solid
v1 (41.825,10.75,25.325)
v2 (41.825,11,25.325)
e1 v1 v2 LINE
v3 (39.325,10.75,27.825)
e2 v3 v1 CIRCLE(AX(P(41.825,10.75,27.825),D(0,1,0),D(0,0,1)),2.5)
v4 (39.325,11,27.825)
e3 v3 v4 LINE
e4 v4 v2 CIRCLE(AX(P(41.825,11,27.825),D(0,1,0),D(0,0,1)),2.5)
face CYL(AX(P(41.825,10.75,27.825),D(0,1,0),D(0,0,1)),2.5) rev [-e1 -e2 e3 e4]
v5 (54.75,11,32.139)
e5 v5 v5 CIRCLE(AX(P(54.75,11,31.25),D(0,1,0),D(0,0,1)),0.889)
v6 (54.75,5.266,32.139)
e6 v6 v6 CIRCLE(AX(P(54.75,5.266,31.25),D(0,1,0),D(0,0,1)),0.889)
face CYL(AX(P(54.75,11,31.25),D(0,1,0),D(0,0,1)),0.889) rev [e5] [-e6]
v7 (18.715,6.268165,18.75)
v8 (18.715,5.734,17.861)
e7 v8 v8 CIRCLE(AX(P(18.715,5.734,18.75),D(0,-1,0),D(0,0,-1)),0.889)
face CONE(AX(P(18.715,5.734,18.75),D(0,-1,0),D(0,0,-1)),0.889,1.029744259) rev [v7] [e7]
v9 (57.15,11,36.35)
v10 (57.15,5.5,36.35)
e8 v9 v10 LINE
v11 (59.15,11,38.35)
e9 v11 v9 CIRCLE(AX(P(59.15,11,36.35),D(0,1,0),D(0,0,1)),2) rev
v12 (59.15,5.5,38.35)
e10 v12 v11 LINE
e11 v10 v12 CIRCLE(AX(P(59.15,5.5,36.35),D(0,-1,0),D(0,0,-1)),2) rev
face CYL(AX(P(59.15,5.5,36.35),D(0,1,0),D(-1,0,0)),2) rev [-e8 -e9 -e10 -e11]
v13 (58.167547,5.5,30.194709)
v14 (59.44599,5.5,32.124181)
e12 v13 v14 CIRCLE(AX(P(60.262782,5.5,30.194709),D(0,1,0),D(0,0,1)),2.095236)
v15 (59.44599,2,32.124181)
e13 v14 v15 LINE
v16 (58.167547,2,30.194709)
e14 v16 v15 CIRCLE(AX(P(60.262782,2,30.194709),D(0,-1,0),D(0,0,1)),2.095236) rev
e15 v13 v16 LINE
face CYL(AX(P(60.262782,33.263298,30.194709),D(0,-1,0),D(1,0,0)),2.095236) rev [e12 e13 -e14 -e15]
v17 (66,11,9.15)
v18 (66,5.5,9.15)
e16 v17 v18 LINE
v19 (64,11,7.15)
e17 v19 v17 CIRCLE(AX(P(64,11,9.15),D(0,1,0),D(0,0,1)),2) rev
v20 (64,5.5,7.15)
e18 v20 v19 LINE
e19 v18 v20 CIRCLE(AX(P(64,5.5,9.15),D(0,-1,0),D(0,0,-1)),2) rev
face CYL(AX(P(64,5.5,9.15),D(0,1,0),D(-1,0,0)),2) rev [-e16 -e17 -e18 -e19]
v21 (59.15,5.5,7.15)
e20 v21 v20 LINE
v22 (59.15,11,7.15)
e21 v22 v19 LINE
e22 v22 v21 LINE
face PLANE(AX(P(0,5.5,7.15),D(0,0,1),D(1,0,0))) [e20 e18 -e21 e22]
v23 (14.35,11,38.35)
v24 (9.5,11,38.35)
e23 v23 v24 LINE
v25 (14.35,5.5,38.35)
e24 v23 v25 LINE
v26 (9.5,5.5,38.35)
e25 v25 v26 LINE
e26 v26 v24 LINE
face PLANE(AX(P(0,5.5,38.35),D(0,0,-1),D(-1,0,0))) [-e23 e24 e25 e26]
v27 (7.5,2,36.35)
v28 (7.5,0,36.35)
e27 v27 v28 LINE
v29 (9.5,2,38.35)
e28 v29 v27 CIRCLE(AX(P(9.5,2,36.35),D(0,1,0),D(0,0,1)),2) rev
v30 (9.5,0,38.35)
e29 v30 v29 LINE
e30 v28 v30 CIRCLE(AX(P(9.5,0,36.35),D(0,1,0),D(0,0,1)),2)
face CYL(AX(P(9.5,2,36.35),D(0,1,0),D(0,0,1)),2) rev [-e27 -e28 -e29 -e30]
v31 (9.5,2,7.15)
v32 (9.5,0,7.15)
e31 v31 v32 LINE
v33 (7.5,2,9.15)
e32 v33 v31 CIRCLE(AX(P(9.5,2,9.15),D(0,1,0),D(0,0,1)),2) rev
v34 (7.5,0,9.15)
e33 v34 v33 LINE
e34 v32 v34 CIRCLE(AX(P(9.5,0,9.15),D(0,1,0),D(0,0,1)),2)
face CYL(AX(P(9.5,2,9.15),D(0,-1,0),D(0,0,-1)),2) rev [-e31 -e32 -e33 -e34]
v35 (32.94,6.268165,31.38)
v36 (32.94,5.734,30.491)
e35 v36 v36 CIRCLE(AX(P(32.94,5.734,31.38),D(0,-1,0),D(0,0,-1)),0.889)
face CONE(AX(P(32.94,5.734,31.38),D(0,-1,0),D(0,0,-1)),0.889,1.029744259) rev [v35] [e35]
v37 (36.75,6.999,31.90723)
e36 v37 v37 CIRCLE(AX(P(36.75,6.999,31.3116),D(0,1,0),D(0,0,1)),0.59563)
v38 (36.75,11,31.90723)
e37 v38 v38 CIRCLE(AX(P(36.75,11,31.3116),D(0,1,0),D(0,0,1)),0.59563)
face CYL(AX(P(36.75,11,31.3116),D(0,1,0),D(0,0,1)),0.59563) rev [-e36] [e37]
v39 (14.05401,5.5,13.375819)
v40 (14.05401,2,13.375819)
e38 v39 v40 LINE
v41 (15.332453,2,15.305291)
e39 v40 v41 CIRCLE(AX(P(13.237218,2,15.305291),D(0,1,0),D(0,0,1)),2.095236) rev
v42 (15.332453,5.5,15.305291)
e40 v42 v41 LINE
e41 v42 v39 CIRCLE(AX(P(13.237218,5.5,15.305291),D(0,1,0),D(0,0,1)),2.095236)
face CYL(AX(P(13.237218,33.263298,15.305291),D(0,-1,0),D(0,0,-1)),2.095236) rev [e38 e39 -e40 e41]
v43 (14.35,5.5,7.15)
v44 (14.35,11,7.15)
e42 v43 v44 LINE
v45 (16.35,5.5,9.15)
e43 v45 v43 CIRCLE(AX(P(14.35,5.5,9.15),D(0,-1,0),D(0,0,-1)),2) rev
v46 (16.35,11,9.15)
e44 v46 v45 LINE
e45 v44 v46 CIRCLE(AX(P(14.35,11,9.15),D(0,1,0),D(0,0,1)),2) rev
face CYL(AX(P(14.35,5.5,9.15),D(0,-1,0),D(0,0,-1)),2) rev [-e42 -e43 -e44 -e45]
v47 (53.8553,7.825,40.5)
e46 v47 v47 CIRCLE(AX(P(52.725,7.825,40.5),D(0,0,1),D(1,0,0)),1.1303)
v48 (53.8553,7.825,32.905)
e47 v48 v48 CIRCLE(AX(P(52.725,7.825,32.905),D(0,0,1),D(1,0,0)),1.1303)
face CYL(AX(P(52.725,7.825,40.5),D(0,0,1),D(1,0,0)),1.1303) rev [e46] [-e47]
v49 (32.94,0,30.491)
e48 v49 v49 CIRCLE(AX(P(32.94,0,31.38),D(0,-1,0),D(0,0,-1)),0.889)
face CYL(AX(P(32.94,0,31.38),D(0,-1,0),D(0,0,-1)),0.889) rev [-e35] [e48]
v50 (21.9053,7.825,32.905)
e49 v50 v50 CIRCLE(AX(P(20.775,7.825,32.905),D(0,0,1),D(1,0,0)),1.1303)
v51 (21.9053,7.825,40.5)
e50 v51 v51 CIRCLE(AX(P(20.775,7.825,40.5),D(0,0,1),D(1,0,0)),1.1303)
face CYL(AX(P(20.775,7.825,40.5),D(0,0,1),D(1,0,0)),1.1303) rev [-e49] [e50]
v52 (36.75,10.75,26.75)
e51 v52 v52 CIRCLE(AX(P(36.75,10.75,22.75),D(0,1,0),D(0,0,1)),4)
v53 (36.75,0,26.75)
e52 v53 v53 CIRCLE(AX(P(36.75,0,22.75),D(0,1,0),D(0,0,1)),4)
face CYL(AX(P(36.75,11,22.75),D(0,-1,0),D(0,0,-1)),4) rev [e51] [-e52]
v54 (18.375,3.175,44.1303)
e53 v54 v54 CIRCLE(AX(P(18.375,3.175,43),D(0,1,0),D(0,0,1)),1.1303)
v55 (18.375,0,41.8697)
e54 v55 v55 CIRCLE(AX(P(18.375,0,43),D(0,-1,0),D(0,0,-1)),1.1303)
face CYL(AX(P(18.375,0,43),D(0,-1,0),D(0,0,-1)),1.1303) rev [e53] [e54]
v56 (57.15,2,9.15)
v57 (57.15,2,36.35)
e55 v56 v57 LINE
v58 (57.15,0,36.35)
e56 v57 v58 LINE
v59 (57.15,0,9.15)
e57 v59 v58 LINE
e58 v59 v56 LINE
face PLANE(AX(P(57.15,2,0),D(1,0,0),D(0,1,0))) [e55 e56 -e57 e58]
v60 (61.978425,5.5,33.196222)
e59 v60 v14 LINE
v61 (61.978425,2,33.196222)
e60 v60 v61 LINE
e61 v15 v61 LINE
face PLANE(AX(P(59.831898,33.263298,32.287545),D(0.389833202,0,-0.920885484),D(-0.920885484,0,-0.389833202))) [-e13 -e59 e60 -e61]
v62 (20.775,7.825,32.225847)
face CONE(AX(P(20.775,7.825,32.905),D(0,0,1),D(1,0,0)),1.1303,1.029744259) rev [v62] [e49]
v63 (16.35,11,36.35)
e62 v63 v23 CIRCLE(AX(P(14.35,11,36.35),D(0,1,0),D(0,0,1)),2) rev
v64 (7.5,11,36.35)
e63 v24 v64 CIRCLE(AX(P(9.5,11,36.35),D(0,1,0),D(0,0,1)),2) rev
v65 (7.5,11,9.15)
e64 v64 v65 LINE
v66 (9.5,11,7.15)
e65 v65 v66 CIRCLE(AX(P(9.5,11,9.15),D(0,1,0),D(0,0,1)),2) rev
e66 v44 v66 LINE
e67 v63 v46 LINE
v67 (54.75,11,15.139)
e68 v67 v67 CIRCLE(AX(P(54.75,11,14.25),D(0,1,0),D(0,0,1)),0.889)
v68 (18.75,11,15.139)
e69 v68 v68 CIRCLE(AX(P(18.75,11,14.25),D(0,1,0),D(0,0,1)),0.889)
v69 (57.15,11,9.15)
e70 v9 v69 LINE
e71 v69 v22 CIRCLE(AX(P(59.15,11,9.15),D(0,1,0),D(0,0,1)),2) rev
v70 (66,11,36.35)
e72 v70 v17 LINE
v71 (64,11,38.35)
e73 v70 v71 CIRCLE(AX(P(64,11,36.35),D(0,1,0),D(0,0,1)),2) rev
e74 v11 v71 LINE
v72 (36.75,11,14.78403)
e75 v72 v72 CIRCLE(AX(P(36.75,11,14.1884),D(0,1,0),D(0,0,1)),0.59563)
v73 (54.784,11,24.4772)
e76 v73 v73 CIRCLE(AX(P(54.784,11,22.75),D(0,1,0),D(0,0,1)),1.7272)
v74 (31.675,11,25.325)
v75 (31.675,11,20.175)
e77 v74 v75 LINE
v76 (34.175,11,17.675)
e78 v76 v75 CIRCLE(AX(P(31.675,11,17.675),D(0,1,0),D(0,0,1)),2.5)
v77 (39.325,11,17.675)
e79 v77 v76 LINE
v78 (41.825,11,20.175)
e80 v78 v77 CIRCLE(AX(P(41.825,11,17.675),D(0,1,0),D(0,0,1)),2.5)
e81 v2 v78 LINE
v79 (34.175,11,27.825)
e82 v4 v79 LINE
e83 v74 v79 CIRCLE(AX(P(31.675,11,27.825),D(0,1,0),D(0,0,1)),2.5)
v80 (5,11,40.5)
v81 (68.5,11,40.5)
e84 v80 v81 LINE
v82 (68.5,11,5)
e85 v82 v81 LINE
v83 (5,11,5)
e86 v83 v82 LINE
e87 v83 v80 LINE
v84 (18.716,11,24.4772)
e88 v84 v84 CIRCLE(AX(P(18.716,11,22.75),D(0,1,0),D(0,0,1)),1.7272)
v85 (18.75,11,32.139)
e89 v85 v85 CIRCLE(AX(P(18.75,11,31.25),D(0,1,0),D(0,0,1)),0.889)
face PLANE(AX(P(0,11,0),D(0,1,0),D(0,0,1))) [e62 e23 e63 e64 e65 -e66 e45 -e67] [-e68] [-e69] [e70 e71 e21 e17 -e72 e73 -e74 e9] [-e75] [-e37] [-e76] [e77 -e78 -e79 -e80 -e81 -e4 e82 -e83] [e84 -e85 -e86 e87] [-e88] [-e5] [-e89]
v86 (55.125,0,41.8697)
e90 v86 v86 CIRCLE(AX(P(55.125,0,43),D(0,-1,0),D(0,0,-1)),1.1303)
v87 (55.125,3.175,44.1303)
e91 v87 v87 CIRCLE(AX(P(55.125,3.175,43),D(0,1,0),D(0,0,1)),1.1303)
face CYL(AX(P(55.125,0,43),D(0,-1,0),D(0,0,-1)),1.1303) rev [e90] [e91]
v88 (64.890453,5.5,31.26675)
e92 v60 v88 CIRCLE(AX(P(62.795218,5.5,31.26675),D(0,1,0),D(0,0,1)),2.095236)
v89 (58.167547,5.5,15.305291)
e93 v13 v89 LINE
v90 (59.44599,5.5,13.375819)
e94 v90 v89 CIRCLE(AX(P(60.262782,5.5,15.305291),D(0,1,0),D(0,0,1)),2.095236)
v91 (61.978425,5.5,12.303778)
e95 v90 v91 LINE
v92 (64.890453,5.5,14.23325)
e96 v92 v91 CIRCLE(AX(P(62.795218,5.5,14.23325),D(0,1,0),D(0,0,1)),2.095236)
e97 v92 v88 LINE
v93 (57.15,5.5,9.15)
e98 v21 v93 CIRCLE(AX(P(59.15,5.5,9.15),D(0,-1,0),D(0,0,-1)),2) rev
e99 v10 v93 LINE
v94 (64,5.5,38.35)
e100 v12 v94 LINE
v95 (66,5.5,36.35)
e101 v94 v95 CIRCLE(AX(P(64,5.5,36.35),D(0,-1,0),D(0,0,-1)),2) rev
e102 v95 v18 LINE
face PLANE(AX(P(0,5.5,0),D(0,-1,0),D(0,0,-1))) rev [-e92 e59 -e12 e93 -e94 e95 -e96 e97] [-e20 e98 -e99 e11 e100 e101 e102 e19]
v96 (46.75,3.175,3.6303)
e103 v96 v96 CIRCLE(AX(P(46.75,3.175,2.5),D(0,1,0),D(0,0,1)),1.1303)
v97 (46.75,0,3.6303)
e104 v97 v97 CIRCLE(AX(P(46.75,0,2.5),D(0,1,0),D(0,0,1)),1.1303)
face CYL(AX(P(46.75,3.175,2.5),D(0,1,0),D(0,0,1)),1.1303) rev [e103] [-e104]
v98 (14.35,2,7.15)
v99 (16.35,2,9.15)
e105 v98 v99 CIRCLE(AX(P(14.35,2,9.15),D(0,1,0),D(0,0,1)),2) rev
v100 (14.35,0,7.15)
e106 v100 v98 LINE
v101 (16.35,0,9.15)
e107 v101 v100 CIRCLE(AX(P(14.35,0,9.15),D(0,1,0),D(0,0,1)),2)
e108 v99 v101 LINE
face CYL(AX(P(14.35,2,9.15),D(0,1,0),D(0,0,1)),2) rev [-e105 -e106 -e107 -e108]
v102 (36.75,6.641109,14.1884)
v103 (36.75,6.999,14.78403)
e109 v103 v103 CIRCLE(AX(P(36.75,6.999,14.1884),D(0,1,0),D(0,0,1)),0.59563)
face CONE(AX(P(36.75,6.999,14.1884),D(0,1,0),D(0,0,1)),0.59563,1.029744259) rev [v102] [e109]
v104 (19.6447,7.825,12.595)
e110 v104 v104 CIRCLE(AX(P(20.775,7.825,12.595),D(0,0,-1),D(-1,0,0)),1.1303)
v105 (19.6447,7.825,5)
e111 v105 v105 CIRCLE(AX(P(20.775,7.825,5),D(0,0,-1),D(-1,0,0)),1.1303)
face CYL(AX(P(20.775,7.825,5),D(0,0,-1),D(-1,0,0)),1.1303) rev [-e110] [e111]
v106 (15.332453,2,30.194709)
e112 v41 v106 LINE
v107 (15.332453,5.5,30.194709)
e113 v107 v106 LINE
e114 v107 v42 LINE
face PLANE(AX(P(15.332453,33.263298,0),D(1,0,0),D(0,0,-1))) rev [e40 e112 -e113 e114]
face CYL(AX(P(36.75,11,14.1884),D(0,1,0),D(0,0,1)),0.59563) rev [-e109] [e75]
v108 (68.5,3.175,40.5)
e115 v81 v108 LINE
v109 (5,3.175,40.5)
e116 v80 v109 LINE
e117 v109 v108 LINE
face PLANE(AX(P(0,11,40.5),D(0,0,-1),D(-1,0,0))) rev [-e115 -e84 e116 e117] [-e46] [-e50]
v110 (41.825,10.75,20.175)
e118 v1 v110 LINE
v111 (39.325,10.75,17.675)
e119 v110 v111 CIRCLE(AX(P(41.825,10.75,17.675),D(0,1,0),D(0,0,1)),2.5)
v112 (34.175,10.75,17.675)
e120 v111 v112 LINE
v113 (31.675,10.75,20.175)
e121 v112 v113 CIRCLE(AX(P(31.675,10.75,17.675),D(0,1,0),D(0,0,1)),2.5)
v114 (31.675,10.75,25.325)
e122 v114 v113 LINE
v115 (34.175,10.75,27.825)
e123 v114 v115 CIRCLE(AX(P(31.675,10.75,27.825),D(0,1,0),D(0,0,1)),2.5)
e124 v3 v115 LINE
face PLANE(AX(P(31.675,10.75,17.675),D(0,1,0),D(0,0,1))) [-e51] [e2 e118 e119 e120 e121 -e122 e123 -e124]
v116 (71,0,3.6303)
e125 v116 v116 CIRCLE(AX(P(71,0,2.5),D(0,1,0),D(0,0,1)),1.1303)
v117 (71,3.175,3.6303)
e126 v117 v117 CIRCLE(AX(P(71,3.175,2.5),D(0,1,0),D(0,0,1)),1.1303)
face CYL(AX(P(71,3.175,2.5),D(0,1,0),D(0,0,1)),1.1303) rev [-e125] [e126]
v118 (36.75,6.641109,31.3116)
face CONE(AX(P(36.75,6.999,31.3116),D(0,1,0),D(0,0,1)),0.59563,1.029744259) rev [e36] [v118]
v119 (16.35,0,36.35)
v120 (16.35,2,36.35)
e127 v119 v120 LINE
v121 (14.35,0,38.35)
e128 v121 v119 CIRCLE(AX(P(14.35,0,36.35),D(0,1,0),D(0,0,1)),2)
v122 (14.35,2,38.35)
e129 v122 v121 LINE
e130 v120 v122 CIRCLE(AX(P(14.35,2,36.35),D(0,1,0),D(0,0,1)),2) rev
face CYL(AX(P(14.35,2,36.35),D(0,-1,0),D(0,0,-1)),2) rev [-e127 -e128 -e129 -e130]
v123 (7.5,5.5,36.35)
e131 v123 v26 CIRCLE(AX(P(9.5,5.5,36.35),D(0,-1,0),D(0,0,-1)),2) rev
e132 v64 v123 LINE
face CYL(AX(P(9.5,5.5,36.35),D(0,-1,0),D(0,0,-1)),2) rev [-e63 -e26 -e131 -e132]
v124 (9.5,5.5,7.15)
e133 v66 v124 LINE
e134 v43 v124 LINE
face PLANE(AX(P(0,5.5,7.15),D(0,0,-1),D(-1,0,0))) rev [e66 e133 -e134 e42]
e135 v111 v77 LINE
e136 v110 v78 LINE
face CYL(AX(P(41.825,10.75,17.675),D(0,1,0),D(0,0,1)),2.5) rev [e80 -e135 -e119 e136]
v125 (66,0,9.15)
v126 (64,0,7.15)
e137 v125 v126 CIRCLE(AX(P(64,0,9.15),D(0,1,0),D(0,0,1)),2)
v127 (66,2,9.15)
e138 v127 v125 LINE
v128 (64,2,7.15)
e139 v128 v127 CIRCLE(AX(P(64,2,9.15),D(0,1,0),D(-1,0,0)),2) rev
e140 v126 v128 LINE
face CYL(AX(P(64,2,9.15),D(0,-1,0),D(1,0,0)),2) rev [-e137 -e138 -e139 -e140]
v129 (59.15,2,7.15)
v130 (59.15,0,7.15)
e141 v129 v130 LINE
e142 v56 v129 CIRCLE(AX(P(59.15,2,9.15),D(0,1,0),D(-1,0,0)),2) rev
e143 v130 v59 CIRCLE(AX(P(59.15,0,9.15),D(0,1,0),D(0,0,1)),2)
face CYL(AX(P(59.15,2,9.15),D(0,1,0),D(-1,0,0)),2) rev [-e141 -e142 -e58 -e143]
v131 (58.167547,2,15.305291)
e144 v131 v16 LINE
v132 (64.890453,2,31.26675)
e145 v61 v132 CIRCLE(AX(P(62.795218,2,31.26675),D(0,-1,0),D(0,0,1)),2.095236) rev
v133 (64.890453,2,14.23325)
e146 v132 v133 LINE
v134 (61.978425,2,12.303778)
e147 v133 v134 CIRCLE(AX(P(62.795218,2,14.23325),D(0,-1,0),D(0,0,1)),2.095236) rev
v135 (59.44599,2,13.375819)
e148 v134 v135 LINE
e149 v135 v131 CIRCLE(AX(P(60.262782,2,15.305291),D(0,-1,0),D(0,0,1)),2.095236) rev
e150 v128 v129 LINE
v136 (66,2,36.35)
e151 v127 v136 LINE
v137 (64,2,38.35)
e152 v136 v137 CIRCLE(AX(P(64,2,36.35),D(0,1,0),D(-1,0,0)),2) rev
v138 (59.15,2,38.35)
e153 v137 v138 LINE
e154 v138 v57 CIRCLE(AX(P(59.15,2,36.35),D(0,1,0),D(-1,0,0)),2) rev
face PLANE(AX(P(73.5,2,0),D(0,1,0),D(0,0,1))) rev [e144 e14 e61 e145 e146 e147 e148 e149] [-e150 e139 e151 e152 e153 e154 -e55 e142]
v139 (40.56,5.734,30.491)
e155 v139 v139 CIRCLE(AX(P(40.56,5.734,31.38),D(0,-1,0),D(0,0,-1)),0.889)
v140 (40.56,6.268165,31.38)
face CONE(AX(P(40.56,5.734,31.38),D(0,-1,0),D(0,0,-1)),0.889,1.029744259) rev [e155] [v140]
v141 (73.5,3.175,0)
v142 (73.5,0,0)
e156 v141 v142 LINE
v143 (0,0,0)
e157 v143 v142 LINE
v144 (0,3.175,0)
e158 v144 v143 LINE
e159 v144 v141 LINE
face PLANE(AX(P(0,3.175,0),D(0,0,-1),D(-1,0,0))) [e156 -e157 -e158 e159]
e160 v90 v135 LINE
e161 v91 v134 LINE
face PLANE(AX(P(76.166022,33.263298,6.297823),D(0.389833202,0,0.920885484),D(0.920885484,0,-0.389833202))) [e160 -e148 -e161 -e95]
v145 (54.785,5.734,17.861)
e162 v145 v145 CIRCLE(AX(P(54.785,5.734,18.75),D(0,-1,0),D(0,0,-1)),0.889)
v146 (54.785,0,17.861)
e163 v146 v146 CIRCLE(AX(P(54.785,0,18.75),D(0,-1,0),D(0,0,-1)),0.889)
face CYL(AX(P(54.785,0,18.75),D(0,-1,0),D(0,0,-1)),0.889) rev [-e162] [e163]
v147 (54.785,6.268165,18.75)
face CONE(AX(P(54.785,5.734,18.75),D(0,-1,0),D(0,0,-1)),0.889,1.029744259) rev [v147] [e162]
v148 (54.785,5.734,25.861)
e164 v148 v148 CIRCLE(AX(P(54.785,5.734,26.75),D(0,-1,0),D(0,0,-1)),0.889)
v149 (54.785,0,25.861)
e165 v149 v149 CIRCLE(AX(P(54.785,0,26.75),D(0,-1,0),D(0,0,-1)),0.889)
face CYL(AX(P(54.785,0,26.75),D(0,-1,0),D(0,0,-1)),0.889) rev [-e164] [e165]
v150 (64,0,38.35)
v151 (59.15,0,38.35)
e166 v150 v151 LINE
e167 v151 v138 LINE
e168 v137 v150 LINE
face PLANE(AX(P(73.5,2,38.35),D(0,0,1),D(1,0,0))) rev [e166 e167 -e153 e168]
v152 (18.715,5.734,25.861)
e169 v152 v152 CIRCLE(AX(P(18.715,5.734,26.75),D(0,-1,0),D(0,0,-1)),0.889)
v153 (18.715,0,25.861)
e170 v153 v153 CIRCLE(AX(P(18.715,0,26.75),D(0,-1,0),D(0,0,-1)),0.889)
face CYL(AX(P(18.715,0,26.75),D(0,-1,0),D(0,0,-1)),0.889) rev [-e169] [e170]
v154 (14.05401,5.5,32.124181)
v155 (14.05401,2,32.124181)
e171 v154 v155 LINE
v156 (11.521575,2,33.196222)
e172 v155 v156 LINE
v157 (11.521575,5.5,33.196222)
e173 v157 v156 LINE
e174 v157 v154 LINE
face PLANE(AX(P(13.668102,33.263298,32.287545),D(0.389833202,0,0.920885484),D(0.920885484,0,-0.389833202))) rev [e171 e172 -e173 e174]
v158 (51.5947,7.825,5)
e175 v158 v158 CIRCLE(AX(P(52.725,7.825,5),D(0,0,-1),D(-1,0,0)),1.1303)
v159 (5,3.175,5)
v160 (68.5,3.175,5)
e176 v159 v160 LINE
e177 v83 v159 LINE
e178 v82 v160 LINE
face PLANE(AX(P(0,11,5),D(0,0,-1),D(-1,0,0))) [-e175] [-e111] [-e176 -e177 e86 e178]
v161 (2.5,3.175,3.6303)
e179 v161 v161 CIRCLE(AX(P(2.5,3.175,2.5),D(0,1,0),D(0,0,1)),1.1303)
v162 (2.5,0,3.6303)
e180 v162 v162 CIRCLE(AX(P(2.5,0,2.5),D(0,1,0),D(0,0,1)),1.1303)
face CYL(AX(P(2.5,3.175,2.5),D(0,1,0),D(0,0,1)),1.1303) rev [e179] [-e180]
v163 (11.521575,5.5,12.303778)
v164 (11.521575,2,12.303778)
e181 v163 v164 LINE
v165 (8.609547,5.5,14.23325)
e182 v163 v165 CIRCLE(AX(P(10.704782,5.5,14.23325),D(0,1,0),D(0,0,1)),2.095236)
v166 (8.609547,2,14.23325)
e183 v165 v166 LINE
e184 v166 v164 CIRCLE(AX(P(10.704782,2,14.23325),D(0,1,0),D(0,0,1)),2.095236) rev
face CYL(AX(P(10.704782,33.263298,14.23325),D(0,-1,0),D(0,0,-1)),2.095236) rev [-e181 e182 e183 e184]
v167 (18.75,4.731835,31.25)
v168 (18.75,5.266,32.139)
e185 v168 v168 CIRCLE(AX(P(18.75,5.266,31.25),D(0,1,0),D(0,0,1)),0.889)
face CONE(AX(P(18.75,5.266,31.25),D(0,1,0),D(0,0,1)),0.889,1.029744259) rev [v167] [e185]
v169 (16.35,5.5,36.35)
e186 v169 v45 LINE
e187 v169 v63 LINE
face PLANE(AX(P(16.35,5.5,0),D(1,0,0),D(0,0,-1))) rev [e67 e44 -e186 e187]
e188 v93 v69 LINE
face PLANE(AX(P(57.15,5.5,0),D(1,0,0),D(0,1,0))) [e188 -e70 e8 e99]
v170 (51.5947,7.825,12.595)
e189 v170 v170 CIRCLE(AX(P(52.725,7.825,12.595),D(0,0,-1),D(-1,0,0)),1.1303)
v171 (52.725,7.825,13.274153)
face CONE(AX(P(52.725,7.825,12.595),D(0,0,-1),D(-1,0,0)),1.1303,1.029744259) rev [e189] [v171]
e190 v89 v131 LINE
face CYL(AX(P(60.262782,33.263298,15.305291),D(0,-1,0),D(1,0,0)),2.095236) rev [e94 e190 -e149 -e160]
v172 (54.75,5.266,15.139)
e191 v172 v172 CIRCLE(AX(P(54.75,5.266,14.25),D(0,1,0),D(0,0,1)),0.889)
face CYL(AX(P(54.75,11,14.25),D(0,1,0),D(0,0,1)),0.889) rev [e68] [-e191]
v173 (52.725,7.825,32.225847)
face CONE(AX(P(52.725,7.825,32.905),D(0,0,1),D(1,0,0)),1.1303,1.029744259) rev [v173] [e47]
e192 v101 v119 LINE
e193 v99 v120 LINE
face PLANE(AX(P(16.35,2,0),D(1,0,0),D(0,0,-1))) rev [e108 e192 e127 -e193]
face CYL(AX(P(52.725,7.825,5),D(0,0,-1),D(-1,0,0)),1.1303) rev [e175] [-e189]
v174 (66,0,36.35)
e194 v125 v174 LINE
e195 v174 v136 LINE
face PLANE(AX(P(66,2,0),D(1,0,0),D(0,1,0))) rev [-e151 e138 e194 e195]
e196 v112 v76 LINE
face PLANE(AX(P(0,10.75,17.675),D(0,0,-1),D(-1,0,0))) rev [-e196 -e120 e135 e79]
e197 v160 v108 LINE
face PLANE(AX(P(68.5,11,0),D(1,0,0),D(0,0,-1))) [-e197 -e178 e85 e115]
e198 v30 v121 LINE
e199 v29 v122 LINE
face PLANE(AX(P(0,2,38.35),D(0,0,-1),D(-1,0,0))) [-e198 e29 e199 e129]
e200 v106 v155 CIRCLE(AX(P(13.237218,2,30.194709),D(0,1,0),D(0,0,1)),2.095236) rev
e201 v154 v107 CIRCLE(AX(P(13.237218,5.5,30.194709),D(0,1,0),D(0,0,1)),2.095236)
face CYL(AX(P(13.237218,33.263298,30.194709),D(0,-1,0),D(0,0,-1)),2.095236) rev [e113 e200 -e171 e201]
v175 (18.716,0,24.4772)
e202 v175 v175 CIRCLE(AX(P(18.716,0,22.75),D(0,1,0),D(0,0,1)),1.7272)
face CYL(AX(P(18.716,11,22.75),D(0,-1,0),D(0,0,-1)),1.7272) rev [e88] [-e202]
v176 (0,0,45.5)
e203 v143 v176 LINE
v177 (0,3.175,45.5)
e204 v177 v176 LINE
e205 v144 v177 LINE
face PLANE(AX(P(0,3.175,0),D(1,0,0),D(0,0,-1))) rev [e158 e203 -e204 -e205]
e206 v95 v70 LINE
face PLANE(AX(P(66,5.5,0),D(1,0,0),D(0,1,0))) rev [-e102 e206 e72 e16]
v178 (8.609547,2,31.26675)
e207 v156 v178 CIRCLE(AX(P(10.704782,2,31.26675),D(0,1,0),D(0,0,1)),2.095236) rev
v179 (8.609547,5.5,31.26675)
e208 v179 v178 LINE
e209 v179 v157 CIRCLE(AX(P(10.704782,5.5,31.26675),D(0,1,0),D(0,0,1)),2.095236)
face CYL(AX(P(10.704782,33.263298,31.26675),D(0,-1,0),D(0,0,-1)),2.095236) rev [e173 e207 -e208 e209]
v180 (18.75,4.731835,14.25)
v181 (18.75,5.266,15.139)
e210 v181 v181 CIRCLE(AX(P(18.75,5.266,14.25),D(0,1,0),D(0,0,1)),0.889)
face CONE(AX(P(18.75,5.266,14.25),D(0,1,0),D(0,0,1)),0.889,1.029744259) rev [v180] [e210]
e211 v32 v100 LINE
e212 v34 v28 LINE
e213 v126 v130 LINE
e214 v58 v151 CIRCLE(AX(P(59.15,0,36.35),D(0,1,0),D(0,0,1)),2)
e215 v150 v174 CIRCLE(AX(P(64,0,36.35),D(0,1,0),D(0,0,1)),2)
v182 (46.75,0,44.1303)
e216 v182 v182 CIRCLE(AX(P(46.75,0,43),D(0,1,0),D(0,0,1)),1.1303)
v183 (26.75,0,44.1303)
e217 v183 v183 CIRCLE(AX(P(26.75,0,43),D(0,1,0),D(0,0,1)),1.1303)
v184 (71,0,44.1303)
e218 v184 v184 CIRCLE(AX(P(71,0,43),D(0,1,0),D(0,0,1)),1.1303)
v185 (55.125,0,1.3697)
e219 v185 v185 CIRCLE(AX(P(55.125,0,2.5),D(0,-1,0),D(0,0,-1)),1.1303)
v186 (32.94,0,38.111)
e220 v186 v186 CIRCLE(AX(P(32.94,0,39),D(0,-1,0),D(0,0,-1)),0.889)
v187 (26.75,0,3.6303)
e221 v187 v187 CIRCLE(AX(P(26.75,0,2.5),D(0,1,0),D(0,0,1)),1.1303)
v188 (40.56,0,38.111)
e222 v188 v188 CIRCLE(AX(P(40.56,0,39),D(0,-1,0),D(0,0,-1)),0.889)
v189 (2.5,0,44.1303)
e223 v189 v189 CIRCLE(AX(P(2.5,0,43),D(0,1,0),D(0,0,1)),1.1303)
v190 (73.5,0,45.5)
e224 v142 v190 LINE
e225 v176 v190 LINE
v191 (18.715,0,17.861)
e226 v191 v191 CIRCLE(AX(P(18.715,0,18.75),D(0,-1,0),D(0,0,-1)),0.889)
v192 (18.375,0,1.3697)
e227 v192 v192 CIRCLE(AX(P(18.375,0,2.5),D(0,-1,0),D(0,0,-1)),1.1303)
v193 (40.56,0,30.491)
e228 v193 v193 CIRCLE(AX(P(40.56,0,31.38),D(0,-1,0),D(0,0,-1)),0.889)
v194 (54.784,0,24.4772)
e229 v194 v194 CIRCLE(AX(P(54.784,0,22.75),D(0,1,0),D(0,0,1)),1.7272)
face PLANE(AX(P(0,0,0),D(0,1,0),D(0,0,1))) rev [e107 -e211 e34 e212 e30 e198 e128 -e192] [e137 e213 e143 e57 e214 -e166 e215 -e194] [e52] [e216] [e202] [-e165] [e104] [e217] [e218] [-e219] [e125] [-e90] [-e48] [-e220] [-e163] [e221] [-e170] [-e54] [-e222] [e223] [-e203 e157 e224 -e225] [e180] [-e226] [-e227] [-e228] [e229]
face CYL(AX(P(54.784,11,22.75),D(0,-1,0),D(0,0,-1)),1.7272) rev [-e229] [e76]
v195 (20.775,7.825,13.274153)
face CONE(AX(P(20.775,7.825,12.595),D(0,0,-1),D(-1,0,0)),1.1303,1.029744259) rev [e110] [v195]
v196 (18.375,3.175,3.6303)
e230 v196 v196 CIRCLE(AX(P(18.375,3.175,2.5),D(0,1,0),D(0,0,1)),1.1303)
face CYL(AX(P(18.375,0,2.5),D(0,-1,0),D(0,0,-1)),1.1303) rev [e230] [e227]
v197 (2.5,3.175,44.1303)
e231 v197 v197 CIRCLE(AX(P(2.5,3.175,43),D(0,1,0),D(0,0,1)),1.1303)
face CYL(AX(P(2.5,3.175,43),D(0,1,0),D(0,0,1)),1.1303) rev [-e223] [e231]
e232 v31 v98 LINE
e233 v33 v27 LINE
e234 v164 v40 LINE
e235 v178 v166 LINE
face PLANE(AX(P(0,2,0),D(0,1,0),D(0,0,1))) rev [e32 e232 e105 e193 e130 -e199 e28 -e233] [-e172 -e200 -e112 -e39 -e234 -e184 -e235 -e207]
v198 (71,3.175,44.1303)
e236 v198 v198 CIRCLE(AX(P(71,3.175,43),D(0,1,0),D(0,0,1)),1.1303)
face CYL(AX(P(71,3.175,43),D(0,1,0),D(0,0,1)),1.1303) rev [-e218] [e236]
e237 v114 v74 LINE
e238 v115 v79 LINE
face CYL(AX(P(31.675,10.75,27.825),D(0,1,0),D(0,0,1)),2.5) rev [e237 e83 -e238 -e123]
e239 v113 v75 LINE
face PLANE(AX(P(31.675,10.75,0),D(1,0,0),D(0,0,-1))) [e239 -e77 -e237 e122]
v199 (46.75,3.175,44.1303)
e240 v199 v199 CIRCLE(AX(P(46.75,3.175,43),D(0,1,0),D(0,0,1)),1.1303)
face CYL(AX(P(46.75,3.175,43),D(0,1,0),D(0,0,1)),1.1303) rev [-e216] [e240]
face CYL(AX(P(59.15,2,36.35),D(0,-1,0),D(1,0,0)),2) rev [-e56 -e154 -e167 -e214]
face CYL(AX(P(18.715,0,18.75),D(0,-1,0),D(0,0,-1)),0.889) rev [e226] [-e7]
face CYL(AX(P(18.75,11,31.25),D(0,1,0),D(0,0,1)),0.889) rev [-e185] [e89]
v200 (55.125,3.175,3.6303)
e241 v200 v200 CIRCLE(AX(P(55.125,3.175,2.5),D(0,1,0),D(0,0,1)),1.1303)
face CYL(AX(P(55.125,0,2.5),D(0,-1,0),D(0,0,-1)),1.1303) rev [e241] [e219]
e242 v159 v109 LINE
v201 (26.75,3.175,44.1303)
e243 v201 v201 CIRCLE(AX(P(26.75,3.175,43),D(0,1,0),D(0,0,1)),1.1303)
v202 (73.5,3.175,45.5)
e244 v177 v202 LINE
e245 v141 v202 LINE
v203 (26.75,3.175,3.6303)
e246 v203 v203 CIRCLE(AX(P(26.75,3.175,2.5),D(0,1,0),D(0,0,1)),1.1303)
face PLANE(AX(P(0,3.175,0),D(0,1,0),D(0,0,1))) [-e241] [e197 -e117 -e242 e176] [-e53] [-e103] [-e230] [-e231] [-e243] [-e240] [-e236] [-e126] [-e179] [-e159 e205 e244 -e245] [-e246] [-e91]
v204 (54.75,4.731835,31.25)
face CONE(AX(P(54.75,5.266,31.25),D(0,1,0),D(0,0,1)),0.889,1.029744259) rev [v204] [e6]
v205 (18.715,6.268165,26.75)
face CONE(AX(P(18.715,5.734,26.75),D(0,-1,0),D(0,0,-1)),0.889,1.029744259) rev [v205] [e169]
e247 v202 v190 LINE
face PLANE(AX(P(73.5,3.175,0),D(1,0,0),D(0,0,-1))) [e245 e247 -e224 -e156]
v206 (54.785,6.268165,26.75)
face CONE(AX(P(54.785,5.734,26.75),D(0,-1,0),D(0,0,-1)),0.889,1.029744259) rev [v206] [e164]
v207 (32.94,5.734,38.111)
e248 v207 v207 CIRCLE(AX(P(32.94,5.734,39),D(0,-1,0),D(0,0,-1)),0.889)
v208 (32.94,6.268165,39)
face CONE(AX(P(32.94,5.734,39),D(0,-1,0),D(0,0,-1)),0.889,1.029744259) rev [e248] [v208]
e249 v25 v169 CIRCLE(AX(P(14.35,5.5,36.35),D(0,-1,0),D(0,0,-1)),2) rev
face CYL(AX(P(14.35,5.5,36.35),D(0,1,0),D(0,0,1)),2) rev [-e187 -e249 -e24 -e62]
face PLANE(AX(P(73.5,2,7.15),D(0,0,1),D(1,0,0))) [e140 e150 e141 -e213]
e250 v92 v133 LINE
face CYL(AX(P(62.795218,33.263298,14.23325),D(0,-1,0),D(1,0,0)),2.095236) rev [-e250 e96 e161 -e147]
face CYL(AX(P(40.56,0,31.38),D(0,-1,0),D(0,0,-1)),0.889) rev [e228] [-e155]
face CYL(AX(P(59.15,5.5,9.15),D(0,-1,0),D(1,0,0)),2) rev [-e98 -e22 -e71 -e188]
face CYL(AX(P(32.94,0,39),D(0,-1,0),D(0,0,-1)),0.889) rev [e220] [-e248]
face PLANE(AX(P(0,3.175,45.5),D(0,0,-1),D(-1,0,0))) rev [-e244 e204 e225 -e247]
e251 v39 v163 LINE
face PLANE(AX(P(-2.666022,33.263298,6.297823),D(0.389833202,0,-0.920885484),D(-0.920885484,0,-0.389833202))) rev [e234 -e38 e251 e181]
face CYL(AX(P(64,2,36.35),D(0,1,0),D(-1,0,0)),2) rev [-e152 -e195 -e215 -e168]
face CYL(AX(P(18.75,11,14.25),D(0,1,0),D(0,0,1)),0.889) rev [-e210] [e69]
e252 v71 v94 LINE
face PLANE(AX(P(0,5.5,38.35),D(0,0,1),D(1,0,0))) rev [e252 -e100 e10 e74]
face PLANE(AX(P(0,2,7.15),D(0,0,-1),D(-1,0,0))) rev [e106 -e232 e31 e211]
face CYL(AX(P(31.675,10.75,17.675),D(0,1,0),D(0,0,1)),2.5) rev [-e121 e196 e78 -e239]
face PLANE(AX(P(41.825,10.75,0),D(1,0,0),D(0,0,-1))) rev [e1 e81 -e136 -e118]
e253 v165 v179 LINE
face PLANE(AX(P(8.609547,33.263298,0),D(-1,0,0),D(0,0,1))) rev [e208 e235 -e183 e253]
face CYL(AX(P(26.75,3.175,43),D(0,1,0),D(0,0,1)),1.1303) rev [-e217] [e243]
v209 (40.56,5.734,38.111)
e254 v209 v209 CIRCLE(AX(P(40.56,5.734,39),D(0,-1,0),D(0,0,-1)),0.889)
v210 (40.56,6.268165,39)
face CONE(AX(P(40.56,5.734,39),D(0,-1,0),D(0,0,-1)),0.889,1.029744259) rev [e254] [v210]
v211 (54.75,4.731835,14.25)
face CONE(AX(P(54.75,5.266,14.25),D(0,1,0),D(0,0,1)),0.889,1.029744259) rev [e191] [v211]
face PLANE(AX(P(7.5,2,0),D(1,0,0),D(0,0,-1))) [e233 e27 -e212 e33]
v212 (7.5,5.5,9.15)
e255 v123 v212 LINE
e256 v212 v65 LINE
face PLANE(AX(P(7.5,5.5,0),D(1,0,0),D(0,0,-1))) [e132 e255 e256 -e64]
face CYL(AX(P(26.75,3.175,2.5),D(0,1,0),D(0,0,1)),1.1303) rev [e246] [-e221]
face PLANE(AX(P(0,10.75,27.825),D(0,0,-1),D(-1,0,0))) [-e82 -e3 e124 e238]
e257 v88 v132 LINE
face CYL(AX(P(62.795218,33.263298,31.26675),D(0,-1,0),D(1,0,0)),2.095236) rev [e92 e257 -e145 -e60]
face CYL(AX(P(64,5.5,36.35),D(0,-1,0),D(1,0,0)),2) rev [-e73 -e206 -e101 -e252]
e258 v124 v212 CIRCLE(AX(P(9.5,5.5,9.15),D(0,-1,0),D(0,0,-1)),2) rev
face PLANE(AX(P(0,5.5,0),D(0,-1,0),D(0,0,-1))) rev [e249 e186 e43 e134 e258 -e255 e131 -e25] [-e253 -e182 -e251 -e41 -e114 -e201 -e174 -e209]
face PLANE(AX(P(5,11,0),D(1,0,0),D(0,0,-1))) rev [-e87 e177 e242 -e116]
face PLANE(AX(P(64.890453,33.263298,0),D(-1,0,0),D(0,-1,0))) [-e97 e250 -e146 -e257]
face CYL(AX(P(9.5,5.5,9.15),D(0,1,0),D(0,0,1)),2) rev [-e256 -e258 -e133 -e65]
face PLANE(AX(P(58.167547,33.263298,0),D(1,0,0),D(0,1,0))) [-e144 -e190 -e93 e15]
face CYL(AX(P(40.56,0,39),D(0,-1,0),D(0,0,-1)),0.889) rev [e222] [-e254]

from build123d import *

# Parameters (mm, degrees)
MAIN_SKETCH_W                           = 73.5
MAIN_SKETCH_H                           = 45.5
MAIN_SKETCH_W_2                         = 63.5
MAIN_SKETCH_H_2                         = 35.5
LIP_DEPTH                               = 3.175
MOUNTING_BASE_OUTLINE_W                 = 63.5
MOUNTING_BASE_OUTLINE_H                 = 35.5
MOUNTING_BASE_OUTLINE_R                 = 1.7272
MOUNTING_BASE_OUTLINE_R_2               = 4
MOUNTING_BASE_DEPTH                     = 11
HEATER_CART_4_40_TAPS_D                 = 2.2606
HEATER_CART_4_40_TAPS_DEPTH             = 7.595
HEATER_CART_4_40_TAPS_TIP               = 0.679152758
HEATER_CART_4_40_TAPS_ON_FACE_2_D       = 2.2606
HEATER_CART_4_40_TAPS_ON_FACE_2_DEPTH   = 7.595
HEATER_CART_4_40_TAPS_ON_FACE_2_TIP     = 0.679152758
MAIN_SKETCH_12_W                        = 8.85
MAIN_SKETCH_12_H                        = 31.2
BOTTOM_SQUARE_CUTOUT_DEPTH              = 2
SQUARE_MICRO_D_CUTOUT_START             = 5.5
SQUARE_MICRO_D_CUTOUT_OUTLINE_W         = 8.85
SQUARE_MICRO_D_CUTOUT_OUTLINE_H         = 31.2
SQUARE_MICRO_D_CUTOUT_DEPTH             = 5.5
MAIN_SKETCH_7_R                         = 0.285
ROUND_MICRO_D_CUTOUT_DEPTH              = 11
INTERNAL_CORNER_CUTOUTS_FILLET_R        = 2
CHIP_CLAMP_0_80_TAPS_AT_2_COUNT         = 2
CHIP_CLAMP_0_80_TAPS_AT_2_PITCH         = 17.1232
CHIP_CLAMP_0_80_TAPS_AT_3_COUNT         = 2
CHIP_CLAMP_0_80_TAPS_AT_3_PITCH         = 17.1232
CHIP_POCKET_START                       = 10.75
MAIN_SKETCH_6_R                         = 2.5
MAIN_SKETCH_6_W                         = 10.15
MAIN_SKETCH_6_H                         = 10.15
CHIP_POCKET_DEPTH                       = 0.25
F_2_56_CLOSE_CLEAR_43_0_089_D           = 2.2606
F_2_56_CLOSE_CLEAR_43_0_089_ON_FACE_2_D = 2.2606
PCB_2_56_TAPS_D                         = 1.778
PCB_2_56_TAPS_DEPTH                     = 5.734
PCB_2_56_TAPS_TIP                       = 0.53416509
BOTTOM_COVER_2_56_TAPS_D                = 1.778
BOTTOM_COVER_2_56_TAPS_DEPTH            = 5.734
BOTTOM_COVER_2_56_TAPS_TIP              = 0.53416509
F_2_56_TAPPED_HOLE1_D                   = 1.778
F_2_56_TAPPED_HOLE1_DEPTH               = 5.734
F_2_56_TAPPED_HOLE1_TIP                 = 0.53416509


# Read off the part's stored shape, not the designer's step: Mounting_Base, Square_Micro_D_Cutout
with BuildPart() as part:
    # Main_Sketch → Lip (new body)
    with BuildSketch(Plane(origin=(0, 0, 0), x_dir=(1, 0, 0), z_dir=(0, 1, 0))):
        with Locations((36.75, -22.75)):
            Rectangle(MAIN_SKETCH_W, MAIN_SKETCH_H)
        with Locations((36.75, -22.75)):
            Rectangle(MAIN_SKETCH_W_2, MAIN_SKETCH_H_2, mode=Mode.SUBTRACT)
    extrude(amount=LIP_DEPTH)

    # Mounting_Base outline → Mounting_Base (add)
    with BuildSketch(Plane(origin=(0, 0, 0), x_dir=(1, 0, 0), z_dir=(0, 1, 0))):
        with Locations((36.75, -22.75)):
            Rectangle(MOUNTING_BASE_OUTLINE_W, MOUNTING_BASE_OUTLINE_H)
        with Locations((18.716, -22.75)):
            Circle(MOUNTING_BASE_OUTLINE_R, mode=Mode.SUBTRACT)
        with Locations((36.75, -22.75)):
            Circle(MOUNTING_BASE_OUTLINE_R_2, mode=Mode.SUBTRACT)
        with Locations((54.784, -22.75)):
            Circle(MOUNTING_BASE_OUTLINE_R, mode=Mode.SUBTRACT)
    extrude(amount=MOUNTING_BASE_DEPTH)

    # Heater_Cart_#4-40_Taps
    with Locations(Plane(origin=(52.725, 7.825, 5), x_dir=(-1, 0, 0), z_dir=(0, 0, -1))):
        with Locations((0, 0), (31.95, 0)):
            Hole(HEATER_CART_4_40_TAPS_D / 2, depth=HEATER_CART_4_40_TAPS_DEPTH)
            with Locations((0, 0, -(HEATER_CART_4_40_TAPS_DEPTH + HEATER_CART_4_40_TAPS_TIP / 2))):  # 118° drill point
                Cone(0, HEATER_CART_4_40_TAPS_D / 2, HEATER_CART_4_40_TAPS_TIP, mode=Mode.SUBTRACT)

    # Heater_Cart_#4-40_Taps on face 2
    with Locations(Plane(origin=(20.775, 7.825, 40.5), x_dir=(1, 0, 0), z_dir=(0, 0, 1))):
        with Locations((0, 0), (31.95, 0)):
            Hole(HEATER_CART_4_40_TAPS_ON_FACE_2_D / 2, depth=HEATER_CART_4_40_TAPS_ON_FACE_2_DEPTH)
            with Locations((0, 0, -(HEATER_CART_4_40_TAPS_ON_FACE_2_DEPTH + HEATER_CART_4_40_TAPS_ON_FACE_2_TIP / 2))):  # 118° drill point
                Cone(0, HEATER_CART_4_40_TAPS_ON_FACE_2_D / 2, HEATER_CART_4_40_TAPS_ON_FACE_2_TIP, mode=Mode.SUBTRACT)

    # Main_Sketch<12> → Bottom_square_cutout (cut)
    with BuildSketch(Plane(origin=(0, 0, 0), x_dir=(1, 0, 0), z_dir=(0, 1, 0))):
        with Locations((11.925, -22.75)):
            Rectangle(MAIN_SKETCH_12_W, MAIN_SKETCH_12_H)
        with BuildLine():
            ThreePointArc((11.521574965, -33.196222286), (10.496212222, -33.351578951), (9.521946869, -32.996175702))
            ThreePointArc((9.521946869, -32.996175702), (8.851632057, -32.244424217), (8.609546604, -31.26675))
            Line((8.609546604, -31.26675), (8.609546604, -14.23325))
            ThreePointArc((8.609546604, -14.23325), (8.851632057, -13.255575783), (9.521946869, -12.503824298))
            ThreePointArc((9.521946869, -12.503824298), (10.496212222, -12.148421049), (11.521574965, -12.303777714))
            Line((11.521574965, -12.303777714), (14.054010046, -13.37581902))
            ThreePointArc((14.054010046, -13.37581902), (14.983840891, -14.148001292), (15.3324534, -15.305291306))
            Line((15.3324534, -15.305291306), (15.3324534, -30.194708694))
            ThreePointArc((15.3324534, -30.194708694), (14.983840891, -31.351998708), (14.054010046, -32.12418098))
            Line((14.054010046, -32.12418098), (11.521574965, -33.196222286))
        make_face(mode=Mode.SUBTRACT)
    bottom_square_cutout = extrude(amount=BOTTOM_SQUARE_CUTOUT_DEPTH, mode=Mode.SUBTRACT)

    # Square_Micro_D_Cutout outline → Square_Micro_D_Cutout (cut)
    with BuildSketch(Plane(origin=(0, 0, 0), x_dir=(1, 0, 0), z_dir=(0, 1, 0)).offset(SQUARE_MICRO_D_CUTOUT_START)):
        with Locations((11.925, -22.75)):
            Rectangle(SQUARE_MICRO_D_CUTOUT_OUTLINE_W, SQUARE_MICRO_D_CUTOUT_OUTLINE_H)
        with BuildLine():
            ThreePointArc((11.521574965, -33.196222286), (9.547492447, -33.013373348), (8.609546604, -31.26675))
            Line((8.609546604, -31.26675), (8.609546604, -14.23325))
            ThreePointArc((8.609546604, -14.23325), (9.547492447, -12.486626652), (11.521574965, -12.303777714))
            Line((11.521574965, -12.303777714), (14.054010046, -13.37581902))
            ThreePointArc((14.054010046, -13.37581902), (14.983840891, -14.148001291), (15.3324534, -15.305291306))
            Line((15.3324534, -15.305291306), (15.3324534, -30.194708694))
            ThreePointArc((15.3324534, -30.194708694), (14.983840891, -31.351998709), (14.054010046, -32.12418098))
            Line((14.054010046, -32.12418098), (11.521574965, -33.196222286))
        make_face(mode=Mode.SUBTRACT)
    square_micro_d_cutout = extrude(amount=SQUARE_MICRO_D_CUTOUT_DEPTH, mode=Mode.SUBTRACT)

    # Main_Sketch<7> → Round_Micro_D_Cutout (cut)
    # profile 1 of 2: a face of its own
    with BuildSketch(Plane(origin=(0, 0, 0), x_dir=(1, 0, 0), z_dir=(0, 1, 0))):
        with BuildLine():
            ThreePointArc((9.521946869, -32.996175702), (8.851632057, -32.244424217), (8.609546604, -31.26675))
            Line((8.609546604, -31.26675), (8.609546604, -14.23325))
            ThreePointArc((8.609546604, -14.23325), (8.851632057, -13.255575783), (9.521946869, -12.503824298))
            ThreePointArc((9.521946869, -12.503824298), (10.496212222, -12.148421049), (11.521574965, -12.303777714))
            Line((11.521574965, -12.303777714), (14.054010046, -13.37581902))
            ThreePointArc((14.054010046, -13.37581902), (14.983840891, -14.148001292), (15.3324534, -15.305291306))
            Line((15.3324534, -15.305291306), (15.3324534, -30.194708694))
            ThreePointArc((15.3324534, -30.194708694), (14.983840891, -31.351998708), (14.054010046, -32.12418098))
            Line((14.054010046, -32.12418098), (11.521574965, -33.196222286))
            ThreePointArc((11.521574965, -33.196222286), (10.496212222, -33.351578951), (9.521946869, -32.996175702))
        make_face()
        with Locations((11.399546604, -22.75)):
            Circle(MAIN_SKETCH_7_R, mode=Mode.SUBTRACT)
    # profile 2 of 2: a face of its own
    with BuildSketch(Plane(origin=(0, 0, 0), x_dir=(1, 0, 0), z_dir=(0, 1, 0))):
        with Locations((11.399546604, -22.75)):
            Circle(MAIN_SKETCH_7_R)
    round_micro_d_cutout = extrude(amount=ROUND_MICRO_D_CUTOUT_DEPTH, mode=Mode.SUBTRACT)

    # MicroD_Mirror: Bottom_square_cutout, Square_Micro_D_Cutout, Round_Micro_D_Cutout across plane
    add(bottom_square_cutout.mirror(Plane(origin=(36.75, 0, 0), x_dir=(0, 0, 1), z_dir=(1, 0, 0))), mode=Mode.SUBTRACT)
    add(square_micro_d_cutout.mirror(Plane(origin=(36.75, 0, 0), x_dir=(0, 0, 1), z_dir=(1, 0, 0))), mode=Mode.SUBTRACT)
    add(round_micro_d_cutout.mirror(Plane(origin=(36.75, 0, 0), x_dir=(0, 0, 1), z_dir=(1, 0, 0))), mode=Mode.SUBTRACT)

    # Internal_Corner_cutouts_fillet
    internal_corner_cutouts_fillet_edges = [part.edges().sort_by_distance(p)[0] for p in [
        (16.35, 8.25, 38.35),
        (7.5, 8.25, 38.35),
        (7.5, 8.25, 7.15),
        (16.35, 8.25, 7.15),
        (57.15, 1, 7.15),
        (57.15, 1, 38.35),
        (66, 1, 38.35),
        (66, 1, 7.15),
        (66, 8.25, 7.15),
        (66, 8.25, 38.35),
        (57.15, 8.25, 38.35),
        (57.15, 8.25, 7.15),
        (16.35, 1, 38.35),
        (16.35, 1, 7.15),
        (7.5, 1, 7.15),
        (7.5, 1, 38.35),
    ]]
    fillet(internal_corner_cutouts_fillet_edges, radius=INTERNAL_CORNER_CUTOUTS_FILLET_R)

    # Sketch3 → Chip_Clamp_#0-80 Taps (revolve, cut)
    with BuildSketch(Plane(origin=(36.75, 11, 31.3116), x_dir=(0, 0, 1), z_dir=(1, 0, 0))):
        Polygon((0, 0), (0, 4.358890611), (0.59563, 4.001), (0.59563, 0), align=None)
    chip_clamp_0_80_taps = revolve(axis=Axis((36.75, 17.35, 31.3116), (0, -1, 0)), mode=Mode.SUBTRACT)

    # Chip_Clamp_#0-80 Taps at 2: Chip_Clamp_#0-80 Taps ×2
    with Locations(*[(0, 0, -i * CHIP_CLAMP_0_80_TAPS_AT_2_PITCH) for i in range(1, CHIP_CLAMP_0_80_TAPS_AT_2_COUNT)]):
        add(chip_clamp_0_80_taps, mode=Mode.SUBTRACT)

    # Chip_Clamp_#0-80 Taps at 3: Chip_Clamp_#0-80 Taps ×2
    with Locations(*[(0, 0, -i * CHIP_CLAMP_0_80_TAPS_AT_3_PITCH) for i in range(1, CHIP_CLAMP_0_80_TAPS_AT_3_COUNT)]):
        add(chip_clamp_0_80_taps, mode=Mode.SUBTRACT)

    # Main_Sketch<6> → Chip_Pocket (cut)
    with BuildSketch(Plane(origin=(0, 0, 0), x_dir=(1, 0, 0), z_dir=(0, 1, 0)).offset(CHIP_POCKET_START)):
        with BuildLine():
            Line((31.675, -20.175), (31.675, -17.675))
            Line((31.675, -17.675), (34.175, -17.675))
            ThreePointArc((34.175, -17.675), (29.907233047, -15.907233047), (31.675, -20.175))
        make_face()
        with BuildLine():
            Line((34.175, -17.675), (31.675, -17.675))
            Line((31.675, -17.675), (31.675, -20.175))
            ThreePointArc((31.675, -20.175), (33.442766953, -19.442766953), (34.175, -17.675))
        make_face()
        with BuildLine():
            ThreePointArc((44.325, -17.675), (41.825, -15.175), (39.325, -17.675))
            Line((39.325, -17.675), (41.825, -17.675))
            Line((41.825, -17.675), (41.825, -20.175))
            ThreePointArc((41.825, -20.175), (43.592766953, -19.442766953), (44.325, -17.675))
        make_face()
        with BuildLine():
            Line((41.825, -17.675), (39.325, -17.675))
            ThreePointArc((39.325, -17.675), (40.057233047, -19.442766953), (41.825, -20.175))
            Line((41.825, -20.175), (41.825, -17.675))
        make_face()
        with BuildLine():
            ThreePointArc((34.175, -27.825), (33.442766953, -26.057233047), (31.675, -25.325))
            Line((31.675, -25.325), (31.675, -27.825))
            Line((31.675, -27.825), (34.175, -27.825))
        make_face()
        with BuildLine():
            Line((31.675, -27.825), (31.675, -25.325))
            ThreePointArc((31.675, -25.325), (29.907233047, -29.592766953), (34.175, -27.825))
            Line((34.175, -27.825), (31.675, -27.825))
        make_face()
        with BuildLine():
            ThreePointArc((44.325, -27.825), (43.592766953, -26.057233047), (41.825, -25.325))
            Line((41.825, -25.325), (41.825, -27.825))
            Line((41.825, -27.825), (39.325, -27.825))
            ThreePointArc((39.325, -27.825), (41.825, -30.325), (44.325, -27.825))
        make_face()
        with BuildLine():
            Line((41.825, -27.825), (41.825, -25.325))
            ThreePointArc((41.825, -25.325), (40.057233047, -26.057233047), (39.325, -27.825))
            Line((39.325, -27.825), (41.825, -27.825))
        make_face()
        with Locations((41.825, -27.825)):
            Circle(MAIN_SKETCH_6_R)
        with Locations((41.825, -17.675)):
            Circle(MAIN_SKETCH_6_R)
        with Locations((31.675, -17.675)):
            Circle(MAIN_SKETCH_6_R)
        with Locations((31.675, -27.825)):
            Circle(MAIN_SKETCH_6_R)
        with Locations((36.75, -22.75)):
            Rectangle(MAIN_SKETCH_6_W, MAIN_SKETCH_6_H)
    extrude(amount=CHIP_POCKET_DEPTH, mode=Mode.SUBTRACT)

    # 2-56_Close_Clear#43 (0.089) (through all)
    with Locations(Plane(origin=(2.5, 3.175, 2.5), x_dir=(0, 0, 1), z_dir=(0, 1, 0))):
        with Locations((0, 0), (40.5, 24.25), (0, 68.5), (0, 44.25), (40.5, 68.5), (40.5, 44.25), (40.5, 0), (0, 24.25)):
            Hole(F_2_56_CLOSE_CLEAR_43_0_089_D / 2)

    # 2-56_Close_Clear#43 (0.089) on face 2 (through all)
    with Locations(Plane(origin=(26.75, 0, 43), x_dir=(0, 0, -1), z_dir=(0, -1, 0))):
        with Locations((0, 0), (40.5, 44.25), (40.5, 20), (0, 44.25), (0, 20), (0, -24.25), (40.5, 0), (40.5, -8.375), (40.5, 28.375), (0, 28.375), (0, -8.375)):
            Hole(F_2_56_CLOSE_CLEAR_43_0_089_ON_FACE_2_D / 2)

    # PCB #2-56 Taps
    with Locations(Plane(origin=(18.75, 11, 14.25), x_dir=(0, 0, 1), z_dir=(0, 1, 0))):
        with Locations((0, 0), (17, 0), (0, 36), (17, 36)):
            Hole(PCB_2_56_TAPS_D / 2, depth=PCB_2_56_TAPS_DEPTH)
            with Locations((0, 0, -(PCB_2_56_TAPS_DEPTH + PCB_2_56_TAPS_TIP / 2))):  # 118° drill point
                Cone(0, PCB_2_56_TAPS_D / 2, PCB_2_56_TAPS_TIP, mode=Mode.SUBTRACT)

    # Bottom_Cover#2-56 Taps
    with Locations(Plane(origin=(54.785, 0, 18.750000125), x_dir=(0, 0, -1), z_dir=(0, -1, 0))):
        with Locations((0, 0), (-8, 0), (-8, -36.07), (0, -36.07)):
            Hole(BOTTOM_COVER_2_56_TAPS_D / 2, depth=BOTTOM_COVER_2_56_TAPS_DEPTH)
            with Locations((0, 0, -(BOTTOM_COVER_2_56_TAPS_DEPTH + BOTTOM_COVER_2_56_TAPS_TIP / 2))):  # 118° drill point
                Cone(0, BOTTOM_COVER_2_56_TAPS_D / 2, BOTTOM_COVER_2_56_TAPS_TIP, mode=Mode.SUBTRACT)

    # #2-56 Tapped Hole1
    with Locations(Plane(origin=(32.94, 0, 31.38), x_dir=(0, 0, -1), z_dir=(0, -1, 0))):
        with Locations((0, 0), (-7.62, 0), (-7.62, 7.62), (0, 7.62)):
            Hole(F_2_56_TAPPED_HOLE1_D / 2, depth=F_2_56_TAPPED_HOLE1_DEPTH)
            with Locations((0, 0, -(F_2_56_TAPPED_HOLE1_DEPTH + F_2_56_TAPPED_HOLE1_TIP / 2))):  # 118° drill point
                Cone(0, F_2_56_TAPPED_HOLE1_D / 2, F_2_56_TAPPED_HOLE1_TIP, mode=Mode.SUBTRACT)


solid = part.part
